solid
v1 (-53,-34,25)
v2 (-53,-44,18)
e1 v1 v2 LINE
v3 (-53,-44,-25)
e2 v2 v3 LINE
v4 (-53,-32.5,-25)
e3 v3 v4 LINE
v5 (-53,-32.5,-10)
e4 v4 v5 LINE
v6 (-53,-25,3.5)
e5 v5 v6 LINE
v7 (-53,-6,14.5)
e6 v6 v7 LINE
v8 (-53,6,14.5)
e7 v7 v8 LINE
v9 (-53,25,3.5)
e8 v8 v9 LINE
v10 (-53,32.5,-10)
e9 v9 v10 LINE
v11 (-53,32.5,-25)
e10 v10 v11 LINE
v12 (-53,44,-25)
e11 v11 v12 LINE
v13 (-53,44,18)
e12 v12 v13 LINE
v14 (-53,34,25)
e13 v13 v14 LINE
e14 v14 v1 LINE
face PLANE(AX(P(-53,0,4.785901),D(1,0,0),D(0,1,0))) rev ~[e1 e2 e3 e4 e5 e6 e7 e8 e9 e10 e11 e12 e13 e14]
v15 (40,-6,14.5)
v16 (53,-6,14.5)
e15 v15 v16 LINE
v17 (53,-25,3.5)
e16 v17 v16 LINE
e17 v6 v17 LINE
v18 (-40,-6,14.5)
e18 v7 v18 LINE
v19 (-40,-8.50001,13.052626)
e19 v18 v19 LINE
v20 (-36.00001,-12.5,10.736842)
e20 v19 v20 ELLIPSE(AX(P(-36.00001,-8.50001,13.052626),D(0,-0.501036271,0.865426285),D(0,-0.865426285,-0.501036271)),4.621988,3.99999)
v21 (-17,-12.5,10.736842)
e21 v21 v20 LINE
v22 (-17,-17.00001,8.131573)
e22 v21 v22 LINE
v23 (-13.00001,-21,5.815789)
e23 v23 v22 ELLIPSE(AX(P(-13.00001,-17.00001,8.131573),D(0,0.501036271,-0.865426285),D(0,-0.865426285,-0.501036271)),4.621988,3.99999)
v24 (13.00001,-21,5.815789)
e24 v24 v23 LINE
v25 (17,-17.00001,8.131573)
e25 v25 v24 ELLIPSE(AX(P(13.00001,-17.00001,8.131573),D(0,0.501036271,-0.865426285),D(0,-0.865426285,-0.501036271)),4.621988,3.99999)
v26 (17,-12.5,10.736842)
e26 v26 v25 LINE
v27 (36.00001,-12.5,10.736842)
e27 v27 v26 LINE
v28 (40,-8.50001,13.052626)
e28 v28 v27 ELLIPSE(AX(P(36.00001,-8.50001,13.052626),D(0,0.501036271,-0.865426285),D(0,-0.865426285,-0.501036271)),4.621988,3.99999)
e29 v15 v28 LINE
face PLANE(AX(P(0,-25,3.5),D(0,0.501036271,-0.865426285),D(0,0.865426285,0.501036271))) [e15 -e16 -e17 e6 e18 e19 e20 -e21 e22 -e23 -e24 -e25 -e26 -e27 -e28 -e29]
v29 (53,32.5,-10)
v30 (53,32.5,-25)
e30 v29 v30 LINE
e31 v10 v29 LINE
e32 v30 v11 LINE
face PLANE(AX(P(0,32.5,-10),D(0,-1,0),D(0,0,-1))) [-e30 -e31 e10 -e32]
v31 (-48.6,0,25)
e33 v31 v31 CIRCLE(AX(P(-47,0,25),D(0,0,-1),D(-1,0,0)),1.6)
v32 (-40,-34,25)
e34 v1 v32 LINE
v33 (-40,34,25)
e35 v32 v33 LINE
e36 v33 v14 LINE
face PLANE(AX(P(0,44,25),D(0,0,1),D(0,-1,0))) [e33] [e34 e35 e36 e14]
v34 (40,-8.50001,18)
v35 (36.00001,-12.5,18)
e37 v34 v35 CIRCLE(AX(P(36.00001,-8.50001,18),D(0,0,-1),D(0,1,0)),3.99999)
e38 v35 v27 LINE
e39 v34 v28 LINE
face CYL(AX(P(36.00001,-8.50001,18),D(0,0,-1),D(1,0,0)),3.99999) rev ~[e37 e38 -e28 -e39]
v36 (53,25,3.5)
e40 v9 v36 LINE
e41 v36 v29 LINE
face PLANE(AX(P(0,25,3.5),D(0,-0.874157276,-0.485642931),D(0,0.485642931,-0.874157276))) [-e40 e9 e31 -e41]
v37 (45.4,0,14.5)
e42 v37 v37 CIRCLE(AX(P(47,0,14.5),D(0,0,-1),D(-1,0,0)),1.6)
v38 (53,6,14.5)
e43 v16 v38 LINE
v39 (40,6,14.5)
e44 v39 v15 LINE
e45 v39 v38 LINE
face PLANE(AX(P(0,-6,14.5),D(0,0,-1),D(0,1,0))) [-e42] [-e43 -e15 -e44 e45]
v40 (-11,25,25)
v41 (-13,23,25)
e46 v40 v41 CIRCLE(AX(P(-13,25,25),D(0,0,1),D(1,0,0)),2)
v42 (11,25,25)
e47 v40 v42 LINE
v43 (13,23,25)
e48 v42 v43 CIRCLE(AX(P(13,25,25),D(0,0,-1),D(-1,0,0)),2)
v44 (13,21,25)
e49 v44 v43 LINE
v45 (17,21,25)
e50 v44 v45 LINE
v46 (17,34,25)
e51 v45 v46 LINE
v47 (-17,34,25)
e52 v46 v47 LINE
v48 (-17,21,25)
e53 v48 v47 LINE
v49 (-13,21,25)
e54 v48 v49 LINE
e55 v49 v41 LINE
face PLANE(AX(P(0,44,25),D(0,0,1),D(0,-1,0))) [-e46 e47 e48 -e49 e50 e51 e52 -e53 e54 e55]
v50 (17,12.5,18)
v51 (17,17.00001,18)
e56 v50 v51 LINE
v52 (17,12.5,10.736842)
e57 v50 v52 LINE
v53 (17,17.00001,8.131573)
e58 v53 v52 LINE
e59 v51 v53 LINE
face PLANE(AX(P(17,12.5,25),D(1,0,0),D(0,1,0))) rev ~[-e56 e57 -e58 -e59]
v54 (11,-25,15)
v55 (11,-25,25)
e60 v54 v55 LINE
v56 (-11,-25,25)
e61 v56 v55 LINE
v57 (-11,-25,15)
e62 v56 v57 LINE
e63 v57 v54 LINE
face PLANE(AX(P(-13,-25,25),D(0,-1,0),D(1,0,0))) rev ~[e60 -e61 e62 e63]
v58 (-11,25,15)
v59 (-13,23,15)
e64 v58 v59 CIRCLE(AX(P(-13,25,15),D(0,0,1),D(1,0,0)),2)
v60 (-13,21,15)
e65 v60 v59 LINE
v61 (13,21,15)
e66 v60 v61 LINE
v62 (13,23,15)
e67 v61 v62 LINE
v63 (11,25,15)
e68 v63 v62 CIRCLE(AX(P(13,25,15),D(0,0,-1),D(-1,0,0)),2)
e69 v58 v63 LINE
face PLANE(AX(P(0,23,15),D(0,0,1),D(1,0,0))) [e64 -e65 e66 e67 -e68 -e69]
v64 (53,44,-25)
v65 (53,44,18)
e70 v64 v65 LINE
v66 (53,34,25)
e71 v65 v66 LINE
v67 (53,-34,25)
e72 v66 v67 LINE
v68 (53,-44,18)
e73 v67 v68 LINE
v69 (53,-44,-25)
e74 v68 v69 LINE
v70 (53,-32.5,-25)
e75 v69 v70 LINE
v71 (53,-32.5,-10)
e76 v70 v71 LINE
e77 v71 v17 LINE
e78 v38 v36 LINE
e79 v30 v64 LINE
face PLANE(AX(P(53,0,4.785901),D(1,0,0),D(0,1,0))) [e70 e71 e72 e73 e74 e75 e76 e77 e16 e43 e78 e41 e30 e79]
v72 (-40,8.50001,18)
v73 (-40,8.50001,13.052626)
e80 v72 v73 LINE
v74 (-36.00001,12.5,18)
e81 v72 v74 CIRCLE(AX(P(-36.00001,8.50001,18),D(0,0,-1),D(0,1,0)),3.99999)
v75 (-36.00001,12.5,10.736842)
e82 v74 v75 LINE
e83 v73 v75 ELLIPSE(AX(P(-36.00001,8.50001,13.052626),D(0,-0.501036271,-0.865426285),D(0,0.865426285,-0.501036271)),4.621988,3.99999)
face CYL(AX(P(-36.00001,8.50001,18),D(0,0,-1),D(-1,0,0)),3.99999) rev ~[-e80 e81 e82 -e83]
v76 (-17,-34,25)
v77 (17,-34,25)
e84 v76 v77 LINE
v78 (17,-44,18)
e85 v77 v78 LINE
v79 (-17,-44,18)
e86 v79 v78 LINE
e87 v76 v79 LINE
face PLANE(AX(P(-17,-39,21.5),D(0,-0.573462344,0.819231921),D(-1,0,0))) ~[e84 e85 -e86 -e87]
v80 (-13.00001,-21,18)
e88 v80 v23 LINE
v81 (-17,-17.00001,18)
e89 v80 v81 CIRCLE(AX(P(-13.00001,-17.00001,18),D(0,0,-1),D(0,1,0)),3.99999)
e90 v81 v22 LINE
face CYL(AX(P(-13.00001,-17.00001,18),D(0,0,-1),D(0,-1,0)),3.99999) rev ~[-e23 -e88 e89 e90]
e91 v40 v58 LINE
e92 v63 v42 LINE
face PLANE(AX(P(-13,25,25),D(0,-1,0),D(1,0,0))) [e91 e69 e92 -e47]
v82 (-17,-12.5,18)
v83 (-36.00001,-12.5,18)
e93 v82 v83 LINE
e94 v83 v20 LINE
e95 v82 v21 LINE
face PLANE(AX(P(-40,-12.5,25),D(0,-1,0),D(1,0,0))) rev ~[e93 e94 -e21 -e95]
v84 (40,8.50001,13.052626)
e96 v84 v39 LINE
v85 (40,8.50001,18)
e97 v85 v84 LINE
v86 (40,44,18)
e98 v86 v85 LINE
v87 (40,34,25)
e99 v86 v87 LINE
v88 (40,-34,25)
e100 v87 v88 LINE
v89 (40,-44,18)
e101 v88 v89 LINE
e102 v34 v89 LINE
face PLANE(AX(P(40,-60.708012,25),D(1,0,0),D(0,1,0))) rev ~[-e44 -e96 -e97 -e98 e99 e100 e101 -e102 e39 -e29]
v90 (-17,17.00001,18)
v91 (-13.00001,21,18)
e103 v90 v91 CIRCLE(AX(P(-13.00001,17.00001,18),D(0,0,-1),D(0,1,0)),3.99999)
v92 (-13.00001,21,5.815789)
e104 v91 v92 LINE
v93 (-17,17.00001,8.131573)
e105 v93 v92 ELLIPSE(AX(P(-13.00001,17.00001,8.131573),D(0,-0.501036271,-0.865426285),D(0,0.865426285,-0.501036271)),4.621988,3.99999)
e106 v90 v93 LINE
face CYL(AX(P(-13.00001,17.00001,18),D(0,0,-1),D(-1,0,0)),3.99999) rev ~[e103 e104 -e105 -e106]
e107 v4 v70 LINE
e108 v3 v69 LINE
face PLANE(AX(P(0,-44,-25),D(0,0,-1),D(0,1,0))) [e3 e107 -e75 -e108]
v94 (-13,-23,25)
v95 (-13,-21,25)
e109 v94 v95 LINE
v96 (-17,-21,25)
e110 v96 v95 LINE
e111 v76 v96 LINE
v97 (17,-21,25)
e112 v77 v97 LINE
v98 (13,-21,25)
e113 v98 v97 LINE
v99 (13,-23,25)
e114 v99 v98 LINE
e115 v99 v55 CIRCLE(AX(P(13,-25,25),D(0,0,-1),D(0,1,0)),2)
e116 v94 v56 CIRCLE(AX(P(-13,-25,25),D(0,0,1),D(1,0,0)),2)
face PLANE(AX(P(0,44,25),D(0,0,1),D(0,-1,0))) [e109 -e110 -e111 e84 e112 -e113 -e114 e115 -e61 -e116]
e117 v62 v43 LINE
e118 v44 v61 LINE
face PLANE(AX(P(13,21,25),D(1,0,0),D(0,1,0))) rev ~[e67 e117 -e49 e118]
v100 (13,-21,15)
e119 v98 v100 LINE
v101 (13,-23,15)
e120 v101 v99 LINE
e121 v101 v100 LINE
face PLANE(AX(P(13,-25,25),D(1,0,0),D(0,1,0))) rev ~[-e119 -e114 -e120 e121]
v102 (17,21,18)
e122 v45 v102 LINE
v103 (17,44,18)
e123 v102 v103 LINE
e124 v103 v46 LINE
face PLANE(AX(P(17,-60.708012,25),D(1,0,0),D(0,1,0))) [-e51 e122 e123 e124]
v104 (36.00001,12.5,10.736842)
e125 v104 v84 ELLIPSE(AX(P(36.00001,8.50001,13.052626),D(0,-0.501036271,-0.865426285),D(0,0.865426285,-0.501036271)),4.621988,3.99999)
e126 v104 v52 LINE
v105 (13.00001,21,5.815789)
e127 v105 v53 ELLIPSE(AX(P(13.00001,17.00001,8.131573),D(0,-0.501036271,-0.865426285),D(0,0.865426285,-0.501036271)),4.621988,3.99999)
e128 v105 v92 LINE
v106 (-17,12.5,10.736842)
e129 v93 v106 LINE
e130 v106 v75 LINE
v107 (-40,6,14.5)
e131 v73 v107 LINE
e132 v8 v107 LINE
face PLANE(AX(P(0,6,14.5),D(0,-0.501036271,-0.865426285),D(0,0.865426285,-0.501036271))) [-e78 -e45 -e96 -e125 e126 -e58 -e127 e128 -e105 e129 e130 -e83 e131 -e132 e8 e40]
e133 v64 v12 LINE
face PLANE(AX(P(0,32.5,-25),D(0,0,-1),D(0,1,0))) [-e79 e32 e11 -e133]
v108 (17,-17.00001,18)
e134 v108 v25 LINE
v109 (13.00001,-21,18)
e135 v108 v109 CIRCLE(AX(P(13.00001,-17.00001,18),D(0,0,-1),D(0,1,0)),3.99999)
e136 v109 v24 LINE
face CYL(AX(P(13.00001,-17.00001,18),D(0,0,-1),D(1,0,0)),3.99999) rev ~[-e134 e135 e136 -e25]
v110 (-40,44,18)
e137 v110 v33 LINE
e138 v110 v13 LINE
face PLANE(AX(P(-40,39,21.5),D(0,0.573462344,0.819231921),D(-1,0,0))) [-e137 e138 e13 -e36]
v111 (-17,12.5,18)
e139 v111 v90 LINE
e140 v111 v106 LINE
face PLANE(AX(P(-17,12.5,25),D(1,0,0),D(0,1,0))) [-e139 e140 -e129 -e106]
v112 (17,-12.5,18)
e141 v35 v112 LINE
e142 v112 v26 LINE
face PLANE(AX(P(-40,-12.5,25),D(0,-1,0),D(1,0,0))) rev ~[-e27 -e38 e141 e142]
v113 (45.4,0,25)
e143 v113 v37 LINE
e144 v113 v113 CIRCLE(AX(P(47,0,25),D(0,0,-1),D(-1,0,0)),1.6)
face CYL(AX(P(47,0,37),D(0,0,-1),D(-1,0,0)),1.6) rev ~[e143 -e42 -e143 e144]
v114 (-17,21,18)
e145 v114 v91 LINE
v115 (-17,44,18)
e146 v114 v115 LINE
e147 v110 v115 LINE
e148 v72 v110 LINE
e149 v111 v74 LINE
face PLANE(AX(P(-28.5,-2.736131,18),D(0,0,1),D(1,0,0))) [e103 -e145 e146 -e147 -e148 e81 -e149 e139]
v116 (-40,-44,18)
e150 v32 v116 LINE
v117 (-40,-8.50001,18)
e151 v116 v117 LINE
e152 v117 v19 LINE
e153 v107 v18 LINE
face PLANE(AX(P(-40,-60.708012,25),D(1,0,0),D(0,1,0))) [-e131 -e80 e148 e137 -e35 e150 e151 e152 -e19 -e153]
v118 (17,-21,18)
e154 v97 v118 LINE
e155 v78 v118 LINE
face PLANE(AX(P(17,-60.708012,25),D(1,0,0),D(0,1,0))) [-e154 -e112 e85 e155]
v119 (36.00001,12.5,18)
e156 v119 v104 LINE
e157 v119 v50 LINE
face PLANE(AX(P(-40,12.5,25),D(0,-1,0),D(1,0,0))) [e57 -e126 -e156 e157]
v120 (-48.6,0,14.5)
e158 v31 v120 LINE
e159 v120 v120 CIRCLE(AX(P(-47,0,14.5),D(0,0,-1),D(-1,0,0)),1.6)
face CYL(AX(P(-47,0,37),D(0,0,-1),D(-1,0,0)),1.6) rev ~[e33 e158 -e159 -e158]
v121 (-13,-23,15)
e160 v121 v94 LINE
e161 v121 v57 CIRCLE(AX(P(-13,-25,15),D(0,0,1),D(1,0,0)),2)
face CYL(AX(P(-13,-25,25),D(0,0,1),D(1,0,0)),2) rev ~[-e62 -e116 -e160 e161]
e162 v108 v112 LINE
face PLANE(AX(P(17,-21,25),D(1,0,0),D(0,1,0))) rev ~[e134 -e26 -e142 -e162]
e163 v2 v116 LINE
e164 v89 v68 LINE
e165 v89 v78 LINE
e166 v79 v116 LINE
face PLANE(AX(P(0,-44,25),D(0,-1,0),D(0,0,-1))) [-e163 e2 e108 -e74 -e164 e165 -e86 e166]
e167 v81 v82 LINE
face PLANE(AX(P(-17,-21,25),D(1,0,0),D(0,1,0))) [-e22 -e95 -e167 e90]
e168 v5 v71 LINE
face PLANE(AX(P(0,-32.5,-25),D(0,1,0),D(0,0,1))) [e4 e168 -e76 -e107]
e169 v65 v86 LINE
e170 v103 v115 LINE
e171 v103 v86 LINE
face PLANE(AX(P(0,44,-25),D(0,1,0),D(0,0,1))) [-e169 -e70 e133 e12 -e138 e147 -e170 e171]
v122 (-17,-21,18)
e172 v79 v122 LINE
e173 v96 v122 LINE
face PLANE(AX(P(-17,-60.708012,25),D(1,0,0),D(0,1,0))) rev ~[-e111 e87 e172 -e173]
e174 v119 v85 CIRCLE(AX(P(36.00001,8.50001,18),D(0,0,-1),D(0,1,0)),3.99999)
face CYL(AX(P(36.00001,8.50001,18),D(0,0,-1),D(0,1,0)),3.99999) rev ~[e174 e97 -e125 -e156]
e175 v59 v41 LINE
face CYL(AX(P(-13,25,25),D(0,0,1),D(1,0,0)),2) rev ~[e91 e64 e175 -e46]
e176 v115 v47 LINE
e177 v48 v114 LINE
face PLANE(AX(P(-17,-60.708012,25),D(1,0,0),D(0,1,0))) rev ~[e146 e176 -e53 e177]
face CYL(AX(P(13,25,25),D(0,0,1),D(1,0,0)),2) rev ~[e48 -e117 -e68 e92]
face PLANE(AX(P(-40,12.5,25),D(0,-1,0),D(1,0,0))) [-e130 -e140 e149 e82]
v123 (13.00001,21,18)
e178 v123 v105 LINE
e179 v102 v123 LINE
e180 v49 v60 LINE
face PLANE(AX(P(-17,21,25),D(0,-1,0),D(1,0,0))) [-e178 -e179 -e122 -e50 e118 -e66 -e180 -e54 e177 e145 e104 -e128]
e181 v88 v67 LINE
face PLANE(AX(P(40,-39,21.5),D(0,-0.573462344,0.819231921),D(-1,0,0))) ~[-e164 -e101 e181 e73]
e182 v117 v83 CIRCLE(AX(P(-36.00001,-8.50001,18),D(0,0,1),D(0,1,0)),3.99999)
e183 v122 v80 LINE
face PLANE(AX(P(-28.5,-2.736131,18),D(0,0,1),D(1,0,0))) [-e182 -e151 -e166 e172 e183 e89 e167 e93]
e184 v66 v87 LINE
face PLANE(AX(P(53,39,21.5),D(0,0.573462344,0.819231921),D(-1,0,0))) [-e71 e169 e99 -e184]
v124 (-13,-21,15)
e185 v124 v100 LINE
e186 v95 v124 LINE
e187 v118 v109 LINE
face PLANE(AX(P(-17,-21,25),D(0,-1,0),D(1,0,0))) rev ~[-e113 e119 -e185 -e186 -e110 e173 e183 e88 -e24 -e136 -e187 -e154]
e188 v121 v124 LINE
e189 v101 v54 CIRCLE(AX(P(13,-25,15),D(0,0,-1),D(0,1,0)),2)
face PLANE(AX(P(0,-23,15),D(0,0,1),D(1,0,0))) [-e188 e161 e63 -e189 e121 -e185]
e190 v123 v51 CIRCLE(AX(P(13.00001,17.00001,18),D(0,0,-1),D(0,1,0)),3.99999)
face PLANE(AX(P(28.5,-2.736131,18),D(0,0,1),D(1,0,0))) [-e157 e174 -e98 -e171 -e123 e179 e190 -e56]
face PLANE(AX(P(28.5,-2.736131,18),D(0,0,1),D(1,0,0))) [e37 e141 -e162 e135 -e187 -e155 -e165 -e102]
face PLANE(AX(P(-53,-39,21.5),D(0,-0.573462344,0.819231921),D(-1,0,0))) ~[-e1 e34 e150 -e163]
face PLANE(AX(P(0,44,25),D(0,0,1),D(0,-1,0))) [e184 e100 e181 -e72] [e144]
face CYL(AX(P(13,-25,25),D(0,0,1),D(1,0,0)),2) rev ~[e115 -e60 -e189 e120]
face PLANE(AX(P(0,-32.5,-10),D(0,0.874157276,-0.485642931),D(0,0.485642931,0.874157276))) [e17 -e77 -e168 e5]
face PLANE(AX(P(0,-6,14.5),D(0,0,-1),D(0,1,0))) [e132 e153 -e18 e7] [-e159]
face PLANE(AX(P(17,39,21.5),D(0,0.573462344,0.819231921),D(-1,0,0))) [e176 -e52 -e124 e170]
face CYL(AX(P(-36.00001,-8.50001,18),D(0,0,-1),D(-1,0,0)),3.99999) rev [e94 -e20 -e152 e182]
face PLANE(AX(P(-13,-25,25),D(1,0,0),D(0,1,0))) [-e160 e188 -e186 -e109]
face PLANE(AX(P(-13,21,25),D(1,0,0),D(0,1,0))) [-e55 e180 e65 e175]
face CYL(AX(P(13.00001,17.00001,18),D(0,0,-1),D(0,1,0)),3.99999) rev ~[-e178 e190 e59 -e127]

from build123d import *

# Parameters (mm, degrees)
F1_DEPTH  = 53
F2_W      = 80
F2_H      = 25
F3_DEPTH  = 25
F4_W      = 23
F4_H      = 115.9437634051
F5_DEPTH  = 7
F6_W      = 34
F6_H      = 8.5
F7_DEPTH  = 50.001
F8_W      = 26
F8_H      = 4
F9_DEPTH  = 10
F10_R     = 2
F11_DEPTH = 10
F12_SIZE2 = 7
F12_SIZE  = 10
F13_SIZE2 = 10
F13_SIZE  = 7
F15_D     = 3.2
F15_DEPTH = 12
F15_TIP   = 0.9613769904
F16_R     = 3.99999


# Not quite as in the source:
# - a fillet or chamfer is up to 0.001 mm smaller than in the source, because OpenCascade refuses the exact size


with BuildPart() as f1:
    # F0 (on Right) → F1 (new body, symmetric)
    with BuildSketch(Plane.YZ):
        Polygon((44, 25), (-44, 25), (-44, -25), (-32.5, -25), (-32.5, -10), (-25, 3.5), (-6, 14.5), (0, 14.5), (6, 14.5), (25, 3.5), (32.5, -10), (32.5, -25), (44, -25), align=None)
    extrude(amount=F1_DEPTH, both=True)

    # F2 (on face) → F3 (cut)
    with BuildSketch(Plane.XY.offset(25)):
        Rectangle(F2_W, F2_H)
    extrude(amount=-F3_DEPTH, mode=Mode.SUBTRACT)

    # F4 (on face) → F5 (cut)
    with BuildSketch(Plane.XY.offset(25)):
        with Locations((-28.5, -2.7361307293)):
            Rectangle(F4_W, F4_H)
        with Locations((28.5, -2.7361307293)):
            Rectangle(F4_W, F4_H)
    extrude(amount=-F5_DEPTH, mode=Mode.SUBTRACT)

    # F6 (on face) → F7 (cut, through all)
    with BuildSketch(Plane.XY.offset(25)):
        with Locations((0, 16.75)):
            Rectangle(F6_W, F6_H)
        with Locations((0, -16.75)):
            Rectangle(F6_W, F6_H)
    extrude(amount=-F7_DEPTH, mode=Mode.SUBTRACT)

    # F8 (on face) → F9 (cut)
    with BuildSketch(Plane.XY.offset(25)):
        with Locations((0, 23)):
            Rectangle(F8_W, F8_H)
        with Locations((0, -23)):
            Rectangle(F8_W, F8_H)
    extrude(amount=-F9_DEPTH, mode=Mode.SUBTRACT)

    # F10 (on face) → F11 (cut)
    with BuildSketch(Plane.XY.offset(25)):
        with Locations((-13, 25)):
            Circle(F10_R)
        with Locations((13, 25)):
            Circle(F10_R)
        with Locations((-13, -25)):
            Circle(F10_R)
        with Locations((13, -25)):
            Circle(F10_R)
    extrude(amount=-F11_DEPTH, mode=Mode.SUBTRACT)

    # F12
    f12_edges = [f1.edges().sort_by_distance(p)[0] for p in [
        (-46.5, -44, 25),
        (0, -44, 25),
        (46.5, -44, 25),
    ]]
    chamfer(f12_edges, length=F12_SIZE, length2=F12_SIZE2)

    # F13
    f13_edges = [f1.edges().sort_by_distance(p)[0] for p in [
        (-46.5, 44, 25),
        (0, 44, 25),
        (46.5, 44, 25),
    ]]
    f13_side = f1.faces().sort_by_distance((0, 44, -1.390719))[0]
    chamfer(f13_edges, length=F13_SIZE, length2=F13_SIZE2, reference=f13_side)

    # F15
    with Locations(Plane.XY.offset(25)):
        with Locations((-47, 0), (47, 0)):
            Hole(F15_D / 2, depth=F15_DEPTH)
            with Locations((0, 0, -(F15_DEPTH + F15_TIP / 2))):  # 118° drill point
                Cone(0, F15_D / 2, F15_TIP, mode=Mode.SUBTRACT)

    # F16 (radius 4 in the source; OpenCascade refuses exactly that, so slightly less here)
    f16_edges = [f1.edges().sort_by_distance(p)[0] for p in [
        (17, 21, 11.907895),
        (-17, 21, 11.907895),
        (-40, 12.5, 14.368421),
        (-40, -12.5, 14.368421),
        (-17, -21, 11.907895),
        (17, -21, 11.907895),
        (40, -12.5, 14.368421),
        (40, 12.5, 14.368421),
    ]]
    fillet(f16_edges, radius=F16_R)


solid = f1.part
